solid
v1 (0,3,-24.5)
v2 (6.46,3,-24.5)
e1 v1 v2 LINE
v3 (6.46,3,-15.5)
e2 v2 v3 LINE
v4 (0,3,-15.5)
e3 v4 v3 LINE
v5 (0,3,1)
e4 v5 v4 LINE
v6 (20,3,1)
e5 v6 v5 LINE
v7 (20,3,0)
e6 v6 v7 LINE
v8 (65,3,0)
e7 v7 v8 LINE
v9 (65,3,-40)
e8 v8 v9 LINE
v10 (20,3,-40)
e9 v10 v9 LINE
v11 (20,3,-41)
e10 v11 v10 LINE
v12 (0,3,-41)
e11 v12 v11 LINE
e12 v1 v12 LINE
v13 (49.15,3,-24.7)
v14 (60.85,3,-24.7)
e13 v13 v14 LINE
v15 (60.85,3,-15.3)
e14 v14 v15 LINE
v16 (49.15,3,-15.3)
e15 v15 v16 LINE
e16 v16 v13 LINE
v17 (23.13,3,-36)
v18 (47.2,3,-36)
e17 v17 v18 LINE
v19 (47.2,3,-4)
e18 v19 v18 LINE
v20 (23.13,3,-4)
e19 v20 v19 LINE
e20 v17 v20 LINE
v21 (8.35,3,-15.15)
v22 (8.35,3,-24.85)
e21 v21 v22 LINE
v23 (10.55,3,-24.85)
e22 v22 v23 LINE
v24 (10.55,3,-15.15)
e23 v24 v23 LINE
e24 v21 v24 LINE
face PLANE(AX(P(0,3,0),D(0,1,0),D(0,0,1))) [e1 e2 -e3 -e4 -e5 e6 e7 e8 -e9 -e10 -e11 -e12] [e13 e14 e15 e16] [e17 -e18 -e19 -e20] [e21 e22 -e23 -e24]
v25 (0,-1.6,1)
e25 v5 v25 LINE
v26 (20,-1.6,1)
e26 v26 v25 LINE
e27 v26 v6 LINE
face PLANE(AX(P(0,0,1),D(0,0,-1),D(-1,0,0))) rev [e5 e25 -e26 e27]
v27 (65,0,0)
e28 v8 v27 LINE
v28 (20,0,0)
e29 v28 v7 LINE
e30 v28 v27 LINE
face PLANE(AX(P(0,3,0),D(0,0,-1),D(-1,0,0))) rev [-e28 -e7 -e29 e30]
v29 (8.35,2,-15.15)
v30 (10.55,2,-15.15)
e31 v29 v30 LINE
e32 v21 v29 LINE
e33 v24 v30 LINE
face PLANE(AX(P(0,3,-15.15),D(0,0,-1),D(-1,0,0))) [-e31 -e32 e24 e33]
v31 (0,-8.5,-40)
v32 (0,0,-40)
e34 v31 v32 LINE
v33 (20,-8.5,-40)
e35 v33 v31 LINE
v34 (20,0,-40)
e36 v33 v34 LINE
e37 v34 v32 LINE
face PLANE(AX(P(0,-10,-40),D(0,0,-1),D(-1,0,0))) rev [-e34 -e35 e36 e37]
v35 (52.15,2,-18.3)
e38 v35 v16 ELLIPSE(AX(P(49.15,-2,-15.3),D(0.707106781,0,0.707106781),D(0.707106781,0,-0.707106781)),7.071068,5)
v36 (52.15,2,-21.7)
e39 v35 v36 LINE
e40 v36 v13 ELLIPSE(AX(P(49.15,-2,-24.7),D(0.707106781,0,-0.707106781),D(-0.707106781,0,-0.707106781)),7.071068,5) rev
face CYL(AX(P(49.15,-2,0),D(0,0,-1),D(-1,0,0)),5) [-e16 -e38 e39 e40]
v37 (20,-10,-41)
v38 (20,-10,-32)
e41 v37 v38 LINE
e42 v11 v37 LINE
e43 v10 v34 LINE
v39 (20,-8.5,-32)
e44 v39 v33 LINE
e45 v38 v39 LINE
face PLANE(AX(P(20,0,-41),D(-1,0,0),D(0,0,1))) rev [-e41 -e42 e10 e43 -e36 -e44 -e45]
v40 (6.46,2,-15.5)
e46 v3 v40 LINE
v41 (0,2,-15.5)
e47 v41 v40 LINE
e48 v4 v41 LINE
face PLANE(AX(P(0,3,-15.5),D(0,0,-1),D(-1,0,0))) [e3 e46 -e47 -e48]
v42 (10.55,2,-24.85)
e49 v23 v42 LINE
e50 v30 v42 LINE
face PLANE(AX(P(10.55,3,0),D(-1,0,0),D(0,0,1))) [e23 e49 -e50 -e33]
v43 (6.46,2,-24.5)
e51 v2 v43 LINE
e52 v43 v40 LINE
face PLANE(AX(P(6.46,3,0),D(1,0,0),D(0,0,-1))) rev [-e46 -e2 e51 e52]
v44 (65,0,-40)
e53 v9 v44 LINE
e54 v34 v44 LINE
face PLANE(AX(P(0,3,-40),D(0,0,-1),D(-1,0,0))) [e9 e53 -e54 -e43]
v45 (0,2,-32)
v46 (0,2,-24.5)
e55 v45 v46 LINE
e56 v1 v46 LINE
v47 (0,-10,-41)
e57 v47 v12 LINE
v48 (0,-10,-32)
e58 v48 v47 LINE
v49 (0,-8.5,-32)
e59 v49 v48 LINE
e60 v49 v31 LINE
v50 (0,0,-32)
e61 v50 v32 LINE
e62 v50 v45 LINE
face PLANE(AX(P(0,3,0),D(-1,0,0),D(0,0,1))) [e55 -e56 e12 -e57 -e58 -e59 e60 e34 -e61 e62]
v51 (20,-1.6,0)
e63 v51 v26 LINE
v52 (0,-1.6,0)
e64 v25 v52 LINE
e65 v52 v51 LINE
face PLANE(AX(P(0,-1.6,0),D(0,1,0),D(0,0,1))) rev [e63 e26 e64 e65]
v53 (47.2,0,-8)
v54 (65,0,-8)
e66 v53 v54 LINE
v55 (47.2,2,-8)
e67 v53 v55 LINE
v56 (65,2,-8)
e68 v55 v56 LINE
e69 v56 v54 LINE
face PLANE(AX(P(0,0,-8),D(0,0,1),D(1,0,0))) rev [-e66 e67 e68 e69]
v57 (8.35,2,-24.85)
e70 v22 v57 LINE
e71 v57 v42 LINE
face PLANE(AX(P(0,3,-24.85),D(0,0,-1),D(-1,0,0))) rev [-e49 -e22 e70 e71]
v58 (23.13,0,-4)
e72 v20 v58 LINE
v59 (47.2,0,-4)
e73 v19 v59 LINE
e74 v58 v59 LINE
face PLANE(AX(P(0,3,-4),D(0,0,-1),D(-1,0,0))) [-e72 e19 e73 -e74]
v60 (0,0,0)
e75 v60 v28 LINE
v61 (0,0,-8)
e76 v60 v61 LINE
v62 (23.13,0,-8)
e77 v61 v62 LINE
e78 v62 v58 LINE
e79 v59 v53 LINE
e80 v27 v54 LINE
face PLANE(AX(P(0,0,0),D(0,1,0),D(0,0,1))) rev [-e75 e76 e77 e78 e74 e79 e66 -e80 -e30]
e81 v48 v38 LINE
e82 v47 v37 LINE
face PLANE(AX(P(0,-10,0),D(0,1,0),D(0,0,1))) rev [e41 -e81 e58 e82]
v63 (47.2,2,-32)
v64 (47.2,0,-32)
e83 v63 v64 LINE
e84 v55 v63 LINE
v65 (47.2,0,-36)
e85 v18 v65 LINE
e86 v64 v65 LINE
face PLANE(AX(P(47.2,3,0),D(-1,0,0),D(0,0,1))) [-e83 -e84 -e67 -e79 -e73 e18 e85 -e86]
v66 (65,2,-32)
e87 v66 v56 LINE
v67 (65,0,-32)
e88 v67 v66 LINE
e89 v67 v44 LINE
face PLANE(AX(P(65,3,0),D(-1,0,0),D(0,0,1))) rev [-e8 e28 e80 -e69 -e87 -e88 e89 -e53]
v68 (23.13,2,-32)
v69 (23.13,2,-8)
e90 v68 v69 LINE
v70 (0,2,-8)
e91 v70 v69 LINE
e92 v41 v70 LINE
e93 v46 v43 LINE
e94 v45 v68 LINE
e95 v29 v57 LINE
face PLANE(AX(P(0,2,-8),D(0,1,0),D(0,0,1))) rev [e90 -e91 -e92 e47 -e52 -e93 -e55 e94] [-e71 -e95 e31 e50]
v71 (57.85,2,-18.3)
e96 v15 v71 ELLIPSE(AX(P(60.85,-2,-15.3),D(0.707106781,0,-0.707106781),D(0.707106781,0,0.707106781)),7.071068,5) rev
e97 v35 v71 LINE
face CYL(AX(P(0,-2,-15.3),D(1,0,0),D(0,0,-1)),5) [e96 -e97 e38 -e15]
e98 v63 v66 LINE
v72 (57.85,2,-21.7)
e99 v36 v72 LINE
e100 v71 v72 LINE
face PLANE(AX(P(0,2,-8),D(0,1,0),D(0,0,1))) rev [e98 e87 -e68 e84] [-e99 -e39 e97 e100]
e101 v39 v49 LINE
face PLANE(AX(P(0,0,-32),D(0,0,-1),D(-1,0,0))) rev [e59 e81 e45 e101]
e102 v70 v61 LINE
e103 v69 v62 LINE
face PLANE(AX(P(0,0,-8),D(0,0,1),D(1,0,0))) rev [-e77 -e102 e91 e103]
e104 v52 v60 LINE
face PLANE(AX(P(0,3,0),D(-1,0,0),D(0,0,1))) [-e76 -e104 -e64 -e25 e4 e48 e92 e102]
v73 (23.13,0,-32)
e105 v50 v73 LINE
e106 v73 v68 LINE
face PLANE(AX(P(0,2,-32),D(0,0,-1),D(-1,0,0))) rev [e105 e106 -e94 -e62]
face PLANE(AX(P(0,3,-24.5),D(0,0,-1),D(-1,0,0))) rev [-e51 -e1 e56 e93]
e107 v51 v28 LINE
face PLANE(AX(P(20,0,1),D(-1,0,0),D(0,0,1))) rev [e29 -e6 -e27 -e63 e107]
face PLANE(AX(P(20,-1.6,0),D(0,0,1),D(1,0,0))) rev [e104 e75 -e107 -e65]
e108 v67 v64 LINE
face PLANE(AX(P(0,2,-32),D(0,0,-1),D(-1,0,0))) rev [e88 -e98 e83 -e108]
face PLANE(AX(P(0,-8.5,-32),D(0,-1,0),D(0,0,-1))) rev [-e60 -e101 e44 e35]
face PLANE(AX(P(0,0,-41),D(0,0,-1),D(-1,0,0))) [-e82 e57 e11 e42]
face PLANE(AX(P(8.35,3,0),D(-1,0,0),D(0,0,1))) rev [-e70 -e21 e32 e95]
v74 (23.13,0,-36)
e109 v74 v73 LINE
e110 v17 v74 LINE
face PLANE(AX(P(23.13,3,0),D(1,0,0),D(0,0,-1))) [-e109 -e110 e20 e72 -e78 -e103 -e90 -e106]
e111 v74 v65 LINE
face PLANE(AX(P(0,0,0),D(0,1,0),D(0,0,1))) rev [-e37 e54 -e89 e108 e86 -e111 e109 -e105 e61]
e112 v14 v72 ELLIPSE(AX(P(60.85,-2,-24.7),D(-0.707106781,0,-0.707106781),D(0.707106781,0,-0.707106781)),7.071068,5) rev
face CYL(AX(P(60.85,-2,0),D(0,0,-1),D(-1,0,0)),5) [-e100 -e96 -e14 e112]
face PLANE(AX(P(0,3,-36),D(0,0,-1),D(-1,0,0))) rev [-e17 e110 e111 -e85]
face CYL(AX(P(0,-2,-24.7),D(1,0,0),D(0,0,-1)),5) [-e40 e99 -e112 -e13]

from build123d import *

# Parameters (mm, degrees)
SKETCH1_W               = 2.2
SKETCH1_H               = 9.7
SKETCH1_W_2             = 5.7
SKETCH1_H_2             = 3.4
BOSS_EXTRUDE2_DEPTH     = 3
CUT_EXTRUDE2_DEPTH      = 58.983591645
CUT_EXTRUDE2_DEPTH_BACK = 58.983591645
FILLET1_R               = 5
SKETCH4_W               = 20
SKETCH4_H               = 3
BOSS_EXTRUDE3_DEPTH     = 1
SKETCH5_W               = 20
SKETCH5_H               = 1
BOSS_EXTRUDE4_DEPTH     = 10
SKETCH6_W               = 20
SKETCH6_H               = 1.5
BOSS_EXTRUDE5_DEPTH     = 8
SKETCH7_W               = 20
SKETCH7_H               = 3
BOSS_EXTRUDE6_DEPTH     = 1
SKETCH8_W               = 20
SKETCH8_H               = 1
BOSS_EXTRUDE7_DEPTH     = 1.6


with BuildPart() as part:
    # Sketch1 → Boss-Extrude2 (new body)
    with BuildSketch(Plane(origin=(0, 0, 0), x_dir=(1, 0, 0), z_dir=(0, 1, 0))):
        Polygon((0, 15.5), (0, 0), (65, 0), (65, 40), (0, 40), (0, 24.5), (6.46, 24.5), (6.46, 15.5), align=None)
        with Locations((9.45, 20)):
            Rectangle(SKETCH1_W, SKETCH1_H, mode=Mode.SUBTRACT)
        with Locations((55, 20)):
            Rectangle(SKETCH1_W_2, SKETCH1_H_2, mode=Mode.SUBTRACT)
        Polygon((23.13, 11), (23.13, 29), (23.13, 36), (47.2, 36), (47.2, 29), (47.2, 11), (47.2, 4), (23.13, 4), align=None, mode=Mode.SUBTRACT)
    extrude(amount=BOSS_EXTRUDE2_DEPTH)

    # Sketch3 → Cut-Extrude2 (cut, two sides: drawn at the far end of the back side and taken through both)
    with BuildSketch(Plane(origin=(23.13, 0, 0), x_dir=(0, 0, -1), z_dir=(1, 0, 0)).offset(-CUT_EXTRUDE2_DEPTH_BACK)):
        Polygon((11, -0.008080614), (8, 0), (8, 2), (32, 2), (32, 0), align=None)
    extrude(amount=CUT_EXTRUDE2_DEPTH + CUT_EXTRUDE2_DEPTH_BACK, mode=Mode.SUBTRACT)

    # Fillet1
    # the kernel refuses this fillet: 5 mm, written as the material it takes off along each edge
    with BuildSketch(Plane(origin=(57.85, 3, -18.3), x_dir=(0, 0, 1), z_dir=(-1, 0, 0)), Plane(origin=(52.15, 3, -21.7), x_dir=(0, 0, -1), z_dir=(1, 0, 0))) as fillet1_piece_1:
        with BuildLine():
            CenterArc((3, -5), FILLET1_R, 90, 36.869897646)
            Line((0, -1), (0, 0))
            Line((0, 0), (3, 0))
        make_face()
    extrude(amount=5.7, mode=Mode.SUBTRACT)
    with BuildSketch(Plane(origin=(57.85, 3, -21.7), x_dir=(1, 0, 0), z_dir=(0, 0, 1)), Plane(origin=(52.15, 3, -18.3), x_dir=(-1, 0, 0), z_dir=(0, 0, -1))) as fillet1_piece_2:
        with BuildLine():
            CenterArc((3, -5), FILLET1_R, 90, 36.869897646)
            Line((0, -1), (0, 0))
            Line((0, 0), (3, 0))
        make_face()
    extrude(amount=3.4, mode=Mode.SUBTRACT)
    with BuildSketch(Plane(origin=(65.35, 3, -18.3), x_dir=(0, 0, 1), z_dir=(-1, 0, 0))) as fillet1_piece_3a_section:
        with BuildLine():
            CenterArc((3, -5), FILLET1_R, 90, 36.869897646)
            Line((0, -1), (0, 0))
            Line((0, 0), (3, 0))
        make_face()
    fillet1_piece_3a = extrude(amount=13.2, mode=Mode.PRIVATE)
    fillet1_piece_3a = split(fillet1_piece_3a, bisect_by=Plane(origin=(65, 3, -18.3), z_dir=(-1, 0, 0)), keep=Keep.TOP, mode=Mode.PRIVATE)
    fillet1_piece_3a = split(fillet1_piece_3a, bisect_by=Plane(origin=(57.85, 3, -18.3), z_dir=(1, 0, 0)), keep=Keep.TOP, mode=Mode.PRIVATE)
    with BuildSketch(Plane(origin=(57.85, 3, -21.7), x_dir=(1, 0, 0), z_dir=(0, 0, 1))) as fillet1_piece_3b_section:
        with BuildLine():
            CenterArc((3, -5), FILLET1_R, 90, 36.869897646)
            Line((0, -1), (0, 0))
            Line((0, 0), (3, 0))
        make_face()
    fillet1_piece_3b = extrude(amount=10.9, mode=Mode.PRIVATE)
    fillet1_piece_3b = split(fillet1_piece_3b, bisect_by=Plane(origin=(57.85, 3, -18.3), z_dir=(0, 0, 1)), keep=Keep.TOP, mode=Mode.PRIVATE)
    fillet1_piece_3 = fillet1_piece_3a & fillet1_piece_3b
    add(fillet1_piece_3, mode=Mode.SUBTRACT)
    with BuildSketch(Plane(origin=(57.85, 3, -18.3), x_dir=(0, 0, 1), z_dir=(-1, 0, 0))) as fillet1_piece_4a_section:
        with BuildLine():
            CenterArc((3, -5), FILLET1_R, 90, 36.869897646)
            Line((0, -1), (0, 0))
            Line((0, 0), (3, 0))
        make_face()
    fillet1_piece_4a = extrude(amount=13.2, mode=Mode.PRIVATE)
    fillet1_piece_4a = split(fillet1_piece_4a, bisect_by=Plane(origin=(47.2, 3, -18.3), z_dir=(1, 0, 0)), keep=Keep.TOP, mode=Mode.PRIVATE)
    fillet1_piece_4a = split(fillet1_piece_4a, bisect_by=Plane(origin=(52.15, 3, -18.3), z_dir=(-1, 0, 0)), keep=Keep.TOP, mode=Mode.PRIVATE)
    with BuildSketch(Plane(origin=(52.15, 3, -10.8), x_dir=(-1, 0, 0), z_dir=(0, 0, -1))) as fillet1_piece_4b_section:
        with BuildLine():
            CenterArc((3, -5), FILLET1_R, 90, 36.869897646)
            Line((0, -1), (0, 0))
            Line((0, 0), (3, 0))
        make_face()
    fillet1_piece_4b = extrude(amount=10.9, mode=Mode.PRIVATE)
    fillet1_piece_4b = split(fillet1_piece_4b, bisect_by=Plane(origin=(52.15, 3, -18.3), z_dir=(0, 0, 1)), keep=Keep.TOP, mode=Mode.PRIVATE)
    fillet1_piece_4 = fillet1_piece_4a & fillet1_piece_4b
    add(fillet1_piece_4, mode=Mode.SUBTRACT)
    with BuildSketch(Plane(origin=(52.15, 3, -21.7), x_dir=(0, 0, -1), z_dir=(1, 0, 0))) as fillet1_piece_5a_section:
        with BuildLine():
            CenterArc((3, -5), FILLET1_R, 90, 36.869897646)
            Line((0, -1), (0, 0))
            Line((0, 0), (3, 0))
        make_face()
    fillet1_piece_5a = extrude(amount=13.2, mode=Mode.PRIVATE)
    fillet1_piece_5a = split(fillet1_piece_5a, bisect_by=Plane(origin=(65, 3, -21.7), z_dir=(-1, 0, 0)), keep=Keep.TOP, mode=Mode.PRIVATE)
    fillet1_piece_5a = split(fillet1_piece_5a, bisect_by=Plane(origin=(57.85, 3, -21.7), z_dir=(1, 0, 0)), keep=Keep.TOP, mode=Mode.PRIVATE)
    with BuildSketch(Plane(origin=(57.85, 3, -29.2), x_dir=(1, 0, 0), z_dir=(0, 0, 1))) as fillet1_piece_5b_section:
        with BuildLine():
            CenterArc((3, -5), FILLET1_R, 90, 36.869897646)
            Line((0, -1), (0, 0))
            Line((0, 0), (3, 0))
        make_face()
    fillet1_piece_5b = extrude(amount=10.9, mode=Mode.PRIVATE)
    fillet1_piece_5b = split(fillet1_piece_5b, bisect_by=Plane(origin=(57.85, 3, -21.7), z_dir=(0, 0, -1)), keep=Keep.TOP, mode=Mode.PRIVATE)
    fillet1_piece_5 = fillet1_piece_5a & fillet1_piece_5b
    add(fillet1_piece_5, mode=Mode.SUBTRACT)
    with BuildSketch(Plane(origin=(52.15, 3, -18.3), x_dir=(-1, 0, 0), z_dir=(0, 0, -1))) as fillet1_piece_6a_section:
        with BuildLine():
            CenterArc((3, -5), FILLET1_R, 90, 36.869897646)
            Line((0, -1), (0, 0))
            Line((0, 0), (3, 0))
        make_face()
    fillet1_piece_6a = extrude(amount=10.9, mode=Mode.PRIVATE)
    fillet1_piece_6a = split(fillet1_piece_6a, bisect_by=Plane(origin=(52.15, 3, -21.7), z_dir=(0, 0, -1)), keep=Keep.TOP, mode=Mode.PRIVATE)
    with BuildSketch(Plane(origin=(44.65, 3, -21.7), x_dir=(0, 0, -1), z_dir=(1, 0, 0))) as fillet1_piece_6b_section:
        with BuildLine():
            CenterArc((3, -5), FILLET1_R, 90, 36.869897646)
            Line((0, -1), (0, 0))
            Line((0, 0), (3, 0))
        make_face()
    fillet1_piece_6b = extrude(amount=13.2, mode=Mode.PRIVATE)
    fillet1_piece_6b = split(fillet1_piece_6b, bisect_by=Plane(origin=(47.2, 3, -21.7), z_dir=(1, 0, 0)), keep=Keep.TOP, mode=Mode.PRIVATE)
    fillet1_piece_6b = split(fillet1_piece_6b, bisect_by=Plane(origin=(52.15, 3, -21.7), z_dir=(-1, 0, 0)), keep=Keep.TOP, mode=Mode.PRIVATE)
    fillet1_piece_6 = fillet1_piece_6a & fillet1_piece_6b
    add(fillet1_piece_6, mode=Mode.SUBTRACT)

    # Sketch4 → Boss-Extrude3 (add)
    with BuildSketch(Plane(origin=(0, 0, -40), x_dir=(-1, 0, 0), z_dir=(0, 0, -1))):
        with Locations((-10, 1.5)):
            Rectangle(SKETCH4_W, SKETCH4_H)
    extrude(amount=BOSS_EXTRUDE3_DEPTH)

    # Sketch5 → Boss-Extrude4 (add)
    with BuildSketch(Plane.XZ):
        with Locations((10, -40.5)):
            Rectangle(SKETCH5_W, SKETCH5_H)
    extrude(amount=BOSS_EXTRUDE4_DEPTH)

    # Sketch6 → Boss-Extrude5 (add)
    with BuildSketch(Plane.XY.offset(-40)):
        with Locations((10, -9.25)):
            Rectangle(SKETCH6_W, SKETCH6_H)
    extrude(amount=BOSS_EXTRUDE5_DEPTH)

    # Sketch7 → Boss-Extrude6 (add)
    with BuildSketch(Plane.XY):
        with Locations((10, 1.5)):
            Rectangle(SKETCH7_W, SKETCH7_H)
    extrude(amount=BOSS_EXTRUDE6_DEPTH)

    # Sketch8 → Boss-Extrude7 (add)
    with BuildSketch(Plane.XZ):
        with Locations((10, 0.5)):
            Rectangle(SKETCH8_W, SKETCH8_H)
    extrude(amount=BOSS_EXTRUDE7_DEPTH)


solid = part.part
